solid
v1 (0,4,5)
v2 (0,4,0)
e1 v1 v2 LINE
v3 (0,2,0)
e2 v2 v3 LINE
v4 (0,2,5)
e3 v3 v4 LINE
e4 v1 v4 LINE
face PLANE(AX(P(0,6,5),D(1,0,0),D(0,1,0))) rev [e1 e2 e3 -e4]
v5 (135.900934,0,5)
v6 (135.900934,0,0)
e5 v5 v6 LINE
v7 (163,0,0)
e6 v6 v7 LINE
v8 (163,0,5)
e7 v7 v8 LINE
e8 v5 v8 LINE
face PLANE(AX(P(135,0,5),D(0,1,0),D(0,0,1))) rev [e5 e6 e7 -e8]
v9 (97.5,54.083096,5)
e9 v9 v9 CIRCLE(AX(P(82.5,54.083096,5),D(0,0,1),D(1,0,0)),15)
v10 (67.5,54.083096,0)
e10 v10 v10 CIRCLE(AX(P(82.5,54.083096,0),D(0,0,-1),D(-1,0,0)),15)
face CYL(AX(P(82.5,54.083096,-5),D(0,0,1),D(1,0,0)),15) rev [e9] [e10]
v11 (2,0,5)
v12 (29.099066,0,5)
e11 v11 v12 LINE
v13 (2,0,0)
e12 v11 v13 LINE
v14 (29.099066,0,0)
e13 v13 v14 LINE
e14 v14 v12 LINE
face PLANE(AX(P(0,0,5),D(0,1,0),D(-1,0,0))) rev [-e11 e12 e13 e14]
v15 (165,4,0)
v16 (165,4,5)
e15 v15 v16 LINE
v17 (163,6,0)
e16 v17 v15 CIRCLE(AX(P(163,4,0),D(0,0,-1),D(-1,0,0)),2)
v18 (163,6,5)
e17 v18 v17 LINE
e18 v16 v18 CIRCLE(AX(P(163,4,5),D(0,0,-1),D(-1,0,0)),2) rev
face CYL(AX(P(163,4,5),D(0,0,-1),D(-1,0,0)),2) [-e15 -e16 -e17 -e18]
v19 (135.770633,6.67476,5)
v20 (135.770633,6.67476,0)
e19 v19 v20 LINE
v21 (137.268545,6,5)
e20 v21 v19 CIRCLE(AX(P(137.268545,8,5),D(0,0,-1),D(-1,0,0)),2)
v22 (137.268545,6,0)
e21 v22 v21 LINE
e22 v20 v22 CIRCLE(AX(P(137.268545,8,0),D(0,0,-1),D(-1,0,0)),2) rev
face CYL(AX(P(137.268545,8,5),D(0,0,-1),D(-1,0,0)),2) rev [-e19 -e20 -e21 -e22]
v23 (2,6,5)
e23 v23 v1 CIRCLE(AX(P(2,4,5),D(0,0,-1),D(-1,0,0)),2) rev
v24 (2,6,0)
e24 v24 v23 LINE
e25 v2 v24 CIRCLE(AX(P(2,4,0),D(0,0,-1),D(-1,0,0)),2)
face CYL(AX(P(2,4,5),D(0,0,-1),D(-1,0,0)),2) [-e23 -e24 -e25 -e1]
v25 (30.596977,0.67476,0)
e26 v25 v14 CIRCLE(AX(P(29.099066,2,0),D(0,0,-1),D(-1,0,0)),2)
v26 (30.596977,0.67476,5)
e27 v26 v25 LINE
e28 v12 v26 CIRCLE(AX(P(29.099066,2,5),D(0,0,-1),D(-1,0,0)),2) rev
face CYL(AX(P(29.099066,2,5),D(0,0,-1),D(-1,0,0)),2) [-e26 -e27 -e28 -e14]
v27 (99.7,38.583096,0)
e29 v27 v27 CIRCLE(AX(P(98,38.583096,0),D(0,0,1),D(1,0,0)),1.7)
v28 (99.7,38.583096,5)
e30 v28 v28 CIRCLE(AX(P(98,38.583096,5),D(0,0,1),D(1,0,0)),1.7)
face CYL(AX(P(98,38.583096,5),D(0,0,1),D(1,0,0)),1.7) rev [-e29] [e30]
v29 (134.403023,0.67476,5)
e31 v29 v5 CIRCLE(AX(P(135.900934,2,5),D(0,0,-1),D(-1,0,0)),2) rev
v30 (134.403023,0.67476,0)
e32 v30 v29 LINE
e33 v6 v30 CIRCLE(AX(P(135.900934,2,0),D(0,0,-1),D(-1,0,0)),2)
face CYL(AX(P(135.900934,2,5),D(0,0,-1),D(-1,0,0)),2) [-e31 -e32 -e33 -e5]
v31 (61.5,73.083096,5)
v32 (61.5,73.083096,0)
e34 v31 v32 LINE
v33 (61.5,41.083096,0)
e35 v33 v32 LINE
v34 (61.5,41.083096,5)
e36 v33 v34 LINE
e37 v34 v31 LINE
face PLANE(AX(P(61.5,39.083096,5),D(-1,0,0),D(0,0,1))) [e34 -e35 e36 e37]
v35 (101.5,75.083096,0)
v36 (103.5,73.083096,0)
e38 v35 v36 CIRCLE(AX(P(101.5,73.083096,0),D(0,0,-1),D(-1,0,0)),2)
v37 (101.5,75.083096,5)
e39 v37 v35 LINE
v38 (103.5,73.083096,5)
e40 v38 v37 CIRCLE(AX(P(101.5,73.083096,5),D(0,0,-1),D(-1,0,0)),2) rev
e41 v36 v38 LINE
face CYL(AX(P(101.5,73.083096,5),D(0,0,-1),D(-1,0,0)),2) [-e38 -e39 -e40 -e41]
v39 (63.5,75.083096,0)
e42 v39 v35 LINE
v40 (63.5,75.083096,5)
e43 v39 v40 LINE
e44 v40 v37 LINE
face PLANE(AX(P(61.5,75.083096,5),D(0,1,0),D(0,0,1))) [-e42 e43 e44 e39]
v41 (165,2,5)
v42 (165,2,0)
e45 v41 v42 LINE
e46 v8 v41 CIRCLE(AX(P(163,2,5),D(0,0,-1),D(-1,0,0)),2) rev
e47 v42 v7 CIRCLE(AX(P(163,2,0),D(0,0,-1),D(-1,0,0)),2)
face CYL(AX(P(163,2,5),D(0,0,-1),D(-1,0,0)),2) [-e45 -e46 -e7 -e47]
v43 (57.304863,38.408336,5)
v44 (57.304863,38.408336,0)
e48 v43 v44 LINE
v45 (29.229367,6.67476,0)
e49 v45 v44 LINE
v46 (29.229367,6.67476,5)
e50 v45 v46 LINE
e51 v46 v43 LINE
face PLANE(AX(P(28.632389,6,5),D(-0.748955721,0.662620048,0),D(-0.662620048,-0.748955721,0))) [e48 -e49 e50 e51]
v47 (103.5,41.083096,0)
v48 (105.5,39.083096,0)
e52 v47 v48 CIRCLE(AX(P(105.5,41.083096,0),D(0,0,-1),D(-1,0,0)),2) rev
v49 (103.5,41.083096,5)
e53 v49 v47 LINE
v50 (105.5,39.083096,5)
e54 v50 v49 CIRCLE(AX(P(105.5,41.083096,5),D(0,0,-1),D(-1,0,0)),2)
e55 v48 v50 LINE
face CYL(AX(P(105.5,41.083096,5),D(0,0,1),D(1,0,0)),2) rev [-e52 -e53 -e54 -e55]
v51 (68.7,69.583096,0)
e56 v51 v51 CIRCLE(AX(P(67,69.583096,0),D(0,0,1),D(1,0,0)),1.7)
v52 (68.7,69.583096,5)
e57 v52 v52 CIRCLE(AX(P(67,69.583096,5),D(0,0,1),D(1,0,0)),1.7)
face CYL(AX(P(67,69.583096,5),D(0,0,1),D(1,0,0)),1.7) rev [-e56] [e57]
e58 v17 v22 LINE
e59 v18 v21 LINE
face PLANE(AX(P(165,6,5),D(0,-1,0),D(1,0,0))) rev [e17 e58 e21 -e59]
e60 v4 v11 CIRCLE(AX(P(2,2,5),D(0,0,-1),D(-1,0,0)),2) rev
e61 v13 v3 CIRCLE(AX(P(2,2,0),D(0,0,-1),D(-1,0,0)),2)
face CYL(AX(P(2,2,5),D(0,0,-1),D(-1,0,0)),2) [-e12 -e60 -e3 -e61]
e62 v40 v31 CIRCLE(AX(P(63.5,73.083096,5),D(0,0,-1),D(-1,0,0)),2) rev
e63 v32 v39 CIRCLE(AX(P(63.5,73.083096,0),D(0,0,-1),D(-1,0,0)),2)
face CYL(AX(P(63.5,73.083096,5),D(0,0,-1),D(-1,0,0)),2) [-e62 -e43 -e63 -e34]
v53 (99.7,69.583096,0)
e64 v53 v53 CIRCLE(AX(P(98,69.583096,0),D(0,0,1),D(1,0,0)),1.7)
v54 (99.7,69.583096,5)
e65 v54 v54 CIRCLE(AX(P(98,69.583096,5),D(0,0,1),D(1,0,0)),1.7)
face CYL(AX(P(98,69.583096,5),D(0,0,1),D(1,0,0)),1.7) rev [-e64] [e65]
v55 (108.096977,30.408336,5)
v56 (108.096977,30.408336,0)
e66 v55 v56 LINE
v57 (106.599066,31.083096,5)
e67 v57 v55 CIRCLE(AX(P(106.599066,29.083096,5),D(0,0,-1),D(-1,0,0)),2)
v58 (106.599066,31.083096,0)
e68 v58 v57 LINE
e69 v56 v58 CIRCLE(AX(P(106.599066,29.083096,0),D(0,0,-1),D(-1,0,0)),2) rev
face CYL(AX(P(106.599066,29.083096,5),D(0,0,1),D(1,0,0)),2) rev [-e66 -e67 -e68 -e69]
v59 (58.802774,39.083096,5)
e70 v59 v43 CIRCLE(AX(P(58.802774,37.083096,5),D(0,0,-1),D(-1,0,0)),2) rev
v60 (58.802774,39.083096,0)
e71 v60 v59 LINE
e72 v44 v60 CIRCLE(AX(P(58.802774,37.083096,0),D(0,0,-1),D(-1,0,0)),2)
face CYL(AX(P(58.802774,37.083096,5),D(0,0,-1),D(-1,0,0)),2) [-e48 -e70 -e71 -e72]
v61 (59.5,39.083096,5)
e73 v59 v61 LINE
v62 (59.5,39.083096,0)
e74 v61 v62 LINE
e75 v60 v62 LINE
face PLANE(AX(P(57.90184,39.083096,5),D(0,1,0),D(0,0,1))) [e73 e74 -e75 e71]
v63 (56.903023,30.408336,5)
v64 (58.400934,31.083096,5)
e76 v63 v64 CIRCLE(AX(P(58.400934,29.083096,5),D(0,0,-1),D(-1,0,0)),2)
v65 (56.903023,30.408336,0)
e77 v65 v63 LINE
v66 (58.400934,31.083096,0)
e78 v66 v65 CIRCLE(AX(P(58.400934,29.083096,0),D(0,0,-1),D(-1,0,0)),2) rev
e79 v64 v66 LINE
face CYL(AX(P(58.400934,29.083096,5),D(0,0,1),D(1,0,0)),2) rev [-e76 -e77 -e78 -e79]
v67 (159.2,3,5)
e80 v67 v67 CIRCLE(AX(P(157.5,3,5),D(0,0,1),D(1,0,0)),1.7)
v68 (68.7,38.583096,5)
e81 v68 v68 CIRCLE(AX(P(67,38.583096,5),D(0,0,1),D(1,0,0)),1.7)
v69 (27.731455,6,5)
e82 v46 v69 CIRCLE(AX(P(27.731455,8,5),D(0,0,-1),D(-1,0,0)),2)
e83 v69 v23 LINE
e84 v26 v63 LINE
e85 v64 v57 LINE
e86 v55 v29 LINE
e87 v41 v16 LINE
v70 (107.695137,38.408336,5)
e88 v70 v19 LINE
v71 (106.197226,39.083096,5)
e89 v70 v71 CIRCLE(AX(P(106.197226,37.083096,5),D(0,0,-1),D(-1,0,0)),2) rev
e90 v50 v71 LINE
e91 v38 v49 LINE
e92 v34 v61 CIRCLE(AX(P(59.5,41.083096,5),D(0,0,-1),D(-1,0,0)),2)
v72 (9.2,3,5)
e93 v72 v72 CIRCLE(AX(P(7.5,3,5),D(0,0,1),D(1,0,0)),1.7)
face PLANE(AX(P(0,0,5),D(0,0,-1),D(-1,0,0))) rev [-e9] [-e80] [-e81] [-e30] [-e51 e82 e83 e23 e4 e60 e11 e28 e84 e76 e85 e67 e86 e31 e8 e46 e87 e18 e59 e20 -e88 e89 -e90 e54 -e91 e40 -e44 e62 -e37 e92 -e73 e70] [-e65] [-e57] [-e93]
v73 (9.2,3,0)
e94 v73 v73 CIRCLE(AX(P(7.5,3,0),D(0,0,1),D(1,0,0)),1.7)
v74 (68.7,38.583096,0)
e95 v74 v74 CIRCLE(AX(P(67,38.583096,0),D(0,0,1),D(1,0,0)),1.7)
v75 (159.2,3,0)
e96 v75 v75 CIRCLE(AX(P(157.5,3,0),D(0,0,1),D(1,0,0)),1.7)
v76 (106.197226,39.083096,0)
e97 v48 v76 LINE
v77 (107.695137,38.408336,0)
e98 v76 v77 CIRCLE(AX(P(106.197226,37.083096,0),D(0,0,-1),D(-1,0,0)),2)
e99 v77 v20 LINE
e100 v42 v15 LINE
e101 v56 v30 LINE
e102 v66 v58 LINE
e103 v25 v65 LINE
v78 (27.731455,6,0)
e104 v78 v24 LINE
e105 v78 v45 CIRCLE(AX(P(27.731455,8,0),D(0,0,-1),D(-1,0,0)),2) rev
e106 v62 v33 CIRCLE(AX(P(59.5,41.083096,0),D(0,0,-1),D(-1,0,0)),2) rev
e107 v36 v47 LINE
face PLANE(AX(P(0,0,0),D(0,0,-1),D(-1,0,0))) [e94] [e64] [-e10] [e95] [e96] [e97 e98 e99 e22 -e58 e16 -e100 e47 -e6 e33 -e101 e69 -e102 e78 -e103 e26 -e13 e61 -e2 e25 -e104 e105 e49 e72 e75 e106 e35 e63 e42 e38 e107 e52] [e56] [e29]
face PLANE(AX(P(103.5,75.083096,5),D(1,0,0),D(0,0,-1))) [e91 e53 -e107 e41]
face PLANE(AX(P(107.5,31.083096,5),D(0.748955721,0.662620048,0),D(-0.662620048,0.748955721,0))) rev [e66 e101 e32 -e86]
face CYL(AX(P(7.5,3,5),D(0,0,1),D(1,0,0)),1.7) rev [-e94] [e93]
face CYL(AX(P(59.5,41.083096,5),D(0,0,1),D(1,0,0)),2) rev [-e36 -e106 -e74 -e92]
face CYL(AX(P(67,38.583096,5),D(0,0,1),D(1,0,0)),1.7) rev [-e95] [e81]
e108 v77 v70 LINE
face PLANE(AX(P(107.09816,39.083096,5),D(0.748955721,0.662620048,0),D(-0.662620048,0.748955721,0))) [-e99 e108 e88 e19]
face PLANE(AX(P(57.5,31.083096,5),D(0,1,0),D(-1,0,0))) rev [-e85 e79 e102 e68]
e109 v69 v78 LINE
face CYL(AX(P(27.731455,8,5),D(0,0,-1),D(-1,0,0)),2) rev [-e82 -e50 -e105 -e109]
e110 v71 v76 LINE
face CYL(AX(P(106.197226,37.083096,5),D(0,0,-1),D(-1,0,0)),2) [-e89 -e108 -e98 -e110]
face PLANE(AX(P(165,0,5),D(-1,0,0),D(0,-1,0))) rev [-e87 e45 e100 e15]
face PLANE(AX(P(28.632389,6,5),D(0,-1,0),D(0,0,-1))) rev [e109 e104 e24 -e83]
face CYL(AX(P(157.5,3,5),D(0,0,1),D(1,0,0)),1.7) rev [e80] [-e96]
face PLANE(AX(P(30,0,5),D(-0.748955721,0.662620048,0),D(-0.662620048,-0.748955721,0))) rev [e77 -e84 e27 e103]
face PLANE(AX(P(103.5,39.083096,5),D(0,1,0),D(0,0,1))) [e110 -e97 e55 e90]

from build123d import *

# Parameters (mm, degrees)
EXTRUDE_1_DEPTH            = 5
FILLET_1_R                 = 2
HOLE_WIZARD_M3_1_OUTLINE_R = 1.7
HOLE_WIZARD_M3_1_DEPTH     = 5
SKETCH_4_R                 = 15
CUT_EXTRUDE_1_DEPTH        = 10
HOLE_WIZARD_M3_5_D         = 3.4


# Read off the part's stored shape, not the designer's step: M3 间隙孔1
with BuildPart() as part:
    # 草图1 → 凸台-拉伸1 (new body)
    with BuildSketch(Plane.XY):
        Polygon((30, 0), (57.5, 31.083095625), (107.5, 31.083095625), (135, 0), (165, 0), (165, 6), (136.367610504, 6), (107.098159975, 39.083095625), (103.5, 39.083095625), (103.5, 75.083095625), (61.5, 75.083095625), (61.5, 39.083095625), (57.901840025, 39.083095625), (28.632389496, 6), (0, 6), (0, 0), align=None)
    extrude(amount=EXTRUDE_1_DEPTH)

    # 圆角1
    fillet_1_edges = [part.edges().sort_by_distance(p)[0] for p in [
        (28.632389496, 6, 2.5),
        (0, 6, 2.5),
        (0, 0, 2.5),
        (30, 0, 2.5),
        (57.5, 31.083095625, 2.5),
        (107.5, 31.083095625, 2.5),
        (135, 0, 2.5),
        (165, 0, 2.5),
        (165, 6, 2.5),
        (136.367610504, 6, 2.5),
        (107.098159975, 39.083095625, 2.5),
        (103.5, 39.083095625, 2.5),
        (103.5, 75.083095625, 2.5),
        (61.5, 75.083095625, 2.5),
        (61.5, 39.083095625, 2.5),
        (57.901840025, 39.083095625, 2.5),
    ]]
    fillet(fillet_1_edges, radius=FILLET_1_R)

    # M3 间隙孔1 outline → M3 间隙孔1 (cut)
    with BuildSketch(Plane.XY):
        with Locations((98, 69.583095625)):
            Circle(HOLE_WIZARD_M3_1_OUTLINE_R)
        with Locations((67, 38.583095625)):
            Circle(HOLE_WIZARD_M3_1_OUTLINE_R)
        with Locations((98, 38.583095625)):
            Circle(HOLE_WIZARD_M3_1_OUTLINE_R)
        with Locations((67, 69.583095625)):
            Circle(HOLE_WIZARD_M3_1_OUTLINE_R)
    extrude(amount=HOLE_WIZARD_M3_1_DEPTH, mode=Mode.SUBTRACT)

    # 草图4 → 切除-拉伸1 (cut)
    with BuildSketch(Plane.XY.offset(5)):
        with Locations((82.5, 54.083095625)):
            Circle(SKETCH_4_R)
    extrude(amount=-CUT_EXTRUDE_1_DEPTH, mode=Mode.SUBTRACT)

    # M3 间隙孔5 (through all)
    with Locations(Plane.XY.offset(5)):
        with Locations((7.5, 3), (157.5, 3)):
            Hole(HOLE_WIZARD_M3_5_D / 2)


solid = part.part
